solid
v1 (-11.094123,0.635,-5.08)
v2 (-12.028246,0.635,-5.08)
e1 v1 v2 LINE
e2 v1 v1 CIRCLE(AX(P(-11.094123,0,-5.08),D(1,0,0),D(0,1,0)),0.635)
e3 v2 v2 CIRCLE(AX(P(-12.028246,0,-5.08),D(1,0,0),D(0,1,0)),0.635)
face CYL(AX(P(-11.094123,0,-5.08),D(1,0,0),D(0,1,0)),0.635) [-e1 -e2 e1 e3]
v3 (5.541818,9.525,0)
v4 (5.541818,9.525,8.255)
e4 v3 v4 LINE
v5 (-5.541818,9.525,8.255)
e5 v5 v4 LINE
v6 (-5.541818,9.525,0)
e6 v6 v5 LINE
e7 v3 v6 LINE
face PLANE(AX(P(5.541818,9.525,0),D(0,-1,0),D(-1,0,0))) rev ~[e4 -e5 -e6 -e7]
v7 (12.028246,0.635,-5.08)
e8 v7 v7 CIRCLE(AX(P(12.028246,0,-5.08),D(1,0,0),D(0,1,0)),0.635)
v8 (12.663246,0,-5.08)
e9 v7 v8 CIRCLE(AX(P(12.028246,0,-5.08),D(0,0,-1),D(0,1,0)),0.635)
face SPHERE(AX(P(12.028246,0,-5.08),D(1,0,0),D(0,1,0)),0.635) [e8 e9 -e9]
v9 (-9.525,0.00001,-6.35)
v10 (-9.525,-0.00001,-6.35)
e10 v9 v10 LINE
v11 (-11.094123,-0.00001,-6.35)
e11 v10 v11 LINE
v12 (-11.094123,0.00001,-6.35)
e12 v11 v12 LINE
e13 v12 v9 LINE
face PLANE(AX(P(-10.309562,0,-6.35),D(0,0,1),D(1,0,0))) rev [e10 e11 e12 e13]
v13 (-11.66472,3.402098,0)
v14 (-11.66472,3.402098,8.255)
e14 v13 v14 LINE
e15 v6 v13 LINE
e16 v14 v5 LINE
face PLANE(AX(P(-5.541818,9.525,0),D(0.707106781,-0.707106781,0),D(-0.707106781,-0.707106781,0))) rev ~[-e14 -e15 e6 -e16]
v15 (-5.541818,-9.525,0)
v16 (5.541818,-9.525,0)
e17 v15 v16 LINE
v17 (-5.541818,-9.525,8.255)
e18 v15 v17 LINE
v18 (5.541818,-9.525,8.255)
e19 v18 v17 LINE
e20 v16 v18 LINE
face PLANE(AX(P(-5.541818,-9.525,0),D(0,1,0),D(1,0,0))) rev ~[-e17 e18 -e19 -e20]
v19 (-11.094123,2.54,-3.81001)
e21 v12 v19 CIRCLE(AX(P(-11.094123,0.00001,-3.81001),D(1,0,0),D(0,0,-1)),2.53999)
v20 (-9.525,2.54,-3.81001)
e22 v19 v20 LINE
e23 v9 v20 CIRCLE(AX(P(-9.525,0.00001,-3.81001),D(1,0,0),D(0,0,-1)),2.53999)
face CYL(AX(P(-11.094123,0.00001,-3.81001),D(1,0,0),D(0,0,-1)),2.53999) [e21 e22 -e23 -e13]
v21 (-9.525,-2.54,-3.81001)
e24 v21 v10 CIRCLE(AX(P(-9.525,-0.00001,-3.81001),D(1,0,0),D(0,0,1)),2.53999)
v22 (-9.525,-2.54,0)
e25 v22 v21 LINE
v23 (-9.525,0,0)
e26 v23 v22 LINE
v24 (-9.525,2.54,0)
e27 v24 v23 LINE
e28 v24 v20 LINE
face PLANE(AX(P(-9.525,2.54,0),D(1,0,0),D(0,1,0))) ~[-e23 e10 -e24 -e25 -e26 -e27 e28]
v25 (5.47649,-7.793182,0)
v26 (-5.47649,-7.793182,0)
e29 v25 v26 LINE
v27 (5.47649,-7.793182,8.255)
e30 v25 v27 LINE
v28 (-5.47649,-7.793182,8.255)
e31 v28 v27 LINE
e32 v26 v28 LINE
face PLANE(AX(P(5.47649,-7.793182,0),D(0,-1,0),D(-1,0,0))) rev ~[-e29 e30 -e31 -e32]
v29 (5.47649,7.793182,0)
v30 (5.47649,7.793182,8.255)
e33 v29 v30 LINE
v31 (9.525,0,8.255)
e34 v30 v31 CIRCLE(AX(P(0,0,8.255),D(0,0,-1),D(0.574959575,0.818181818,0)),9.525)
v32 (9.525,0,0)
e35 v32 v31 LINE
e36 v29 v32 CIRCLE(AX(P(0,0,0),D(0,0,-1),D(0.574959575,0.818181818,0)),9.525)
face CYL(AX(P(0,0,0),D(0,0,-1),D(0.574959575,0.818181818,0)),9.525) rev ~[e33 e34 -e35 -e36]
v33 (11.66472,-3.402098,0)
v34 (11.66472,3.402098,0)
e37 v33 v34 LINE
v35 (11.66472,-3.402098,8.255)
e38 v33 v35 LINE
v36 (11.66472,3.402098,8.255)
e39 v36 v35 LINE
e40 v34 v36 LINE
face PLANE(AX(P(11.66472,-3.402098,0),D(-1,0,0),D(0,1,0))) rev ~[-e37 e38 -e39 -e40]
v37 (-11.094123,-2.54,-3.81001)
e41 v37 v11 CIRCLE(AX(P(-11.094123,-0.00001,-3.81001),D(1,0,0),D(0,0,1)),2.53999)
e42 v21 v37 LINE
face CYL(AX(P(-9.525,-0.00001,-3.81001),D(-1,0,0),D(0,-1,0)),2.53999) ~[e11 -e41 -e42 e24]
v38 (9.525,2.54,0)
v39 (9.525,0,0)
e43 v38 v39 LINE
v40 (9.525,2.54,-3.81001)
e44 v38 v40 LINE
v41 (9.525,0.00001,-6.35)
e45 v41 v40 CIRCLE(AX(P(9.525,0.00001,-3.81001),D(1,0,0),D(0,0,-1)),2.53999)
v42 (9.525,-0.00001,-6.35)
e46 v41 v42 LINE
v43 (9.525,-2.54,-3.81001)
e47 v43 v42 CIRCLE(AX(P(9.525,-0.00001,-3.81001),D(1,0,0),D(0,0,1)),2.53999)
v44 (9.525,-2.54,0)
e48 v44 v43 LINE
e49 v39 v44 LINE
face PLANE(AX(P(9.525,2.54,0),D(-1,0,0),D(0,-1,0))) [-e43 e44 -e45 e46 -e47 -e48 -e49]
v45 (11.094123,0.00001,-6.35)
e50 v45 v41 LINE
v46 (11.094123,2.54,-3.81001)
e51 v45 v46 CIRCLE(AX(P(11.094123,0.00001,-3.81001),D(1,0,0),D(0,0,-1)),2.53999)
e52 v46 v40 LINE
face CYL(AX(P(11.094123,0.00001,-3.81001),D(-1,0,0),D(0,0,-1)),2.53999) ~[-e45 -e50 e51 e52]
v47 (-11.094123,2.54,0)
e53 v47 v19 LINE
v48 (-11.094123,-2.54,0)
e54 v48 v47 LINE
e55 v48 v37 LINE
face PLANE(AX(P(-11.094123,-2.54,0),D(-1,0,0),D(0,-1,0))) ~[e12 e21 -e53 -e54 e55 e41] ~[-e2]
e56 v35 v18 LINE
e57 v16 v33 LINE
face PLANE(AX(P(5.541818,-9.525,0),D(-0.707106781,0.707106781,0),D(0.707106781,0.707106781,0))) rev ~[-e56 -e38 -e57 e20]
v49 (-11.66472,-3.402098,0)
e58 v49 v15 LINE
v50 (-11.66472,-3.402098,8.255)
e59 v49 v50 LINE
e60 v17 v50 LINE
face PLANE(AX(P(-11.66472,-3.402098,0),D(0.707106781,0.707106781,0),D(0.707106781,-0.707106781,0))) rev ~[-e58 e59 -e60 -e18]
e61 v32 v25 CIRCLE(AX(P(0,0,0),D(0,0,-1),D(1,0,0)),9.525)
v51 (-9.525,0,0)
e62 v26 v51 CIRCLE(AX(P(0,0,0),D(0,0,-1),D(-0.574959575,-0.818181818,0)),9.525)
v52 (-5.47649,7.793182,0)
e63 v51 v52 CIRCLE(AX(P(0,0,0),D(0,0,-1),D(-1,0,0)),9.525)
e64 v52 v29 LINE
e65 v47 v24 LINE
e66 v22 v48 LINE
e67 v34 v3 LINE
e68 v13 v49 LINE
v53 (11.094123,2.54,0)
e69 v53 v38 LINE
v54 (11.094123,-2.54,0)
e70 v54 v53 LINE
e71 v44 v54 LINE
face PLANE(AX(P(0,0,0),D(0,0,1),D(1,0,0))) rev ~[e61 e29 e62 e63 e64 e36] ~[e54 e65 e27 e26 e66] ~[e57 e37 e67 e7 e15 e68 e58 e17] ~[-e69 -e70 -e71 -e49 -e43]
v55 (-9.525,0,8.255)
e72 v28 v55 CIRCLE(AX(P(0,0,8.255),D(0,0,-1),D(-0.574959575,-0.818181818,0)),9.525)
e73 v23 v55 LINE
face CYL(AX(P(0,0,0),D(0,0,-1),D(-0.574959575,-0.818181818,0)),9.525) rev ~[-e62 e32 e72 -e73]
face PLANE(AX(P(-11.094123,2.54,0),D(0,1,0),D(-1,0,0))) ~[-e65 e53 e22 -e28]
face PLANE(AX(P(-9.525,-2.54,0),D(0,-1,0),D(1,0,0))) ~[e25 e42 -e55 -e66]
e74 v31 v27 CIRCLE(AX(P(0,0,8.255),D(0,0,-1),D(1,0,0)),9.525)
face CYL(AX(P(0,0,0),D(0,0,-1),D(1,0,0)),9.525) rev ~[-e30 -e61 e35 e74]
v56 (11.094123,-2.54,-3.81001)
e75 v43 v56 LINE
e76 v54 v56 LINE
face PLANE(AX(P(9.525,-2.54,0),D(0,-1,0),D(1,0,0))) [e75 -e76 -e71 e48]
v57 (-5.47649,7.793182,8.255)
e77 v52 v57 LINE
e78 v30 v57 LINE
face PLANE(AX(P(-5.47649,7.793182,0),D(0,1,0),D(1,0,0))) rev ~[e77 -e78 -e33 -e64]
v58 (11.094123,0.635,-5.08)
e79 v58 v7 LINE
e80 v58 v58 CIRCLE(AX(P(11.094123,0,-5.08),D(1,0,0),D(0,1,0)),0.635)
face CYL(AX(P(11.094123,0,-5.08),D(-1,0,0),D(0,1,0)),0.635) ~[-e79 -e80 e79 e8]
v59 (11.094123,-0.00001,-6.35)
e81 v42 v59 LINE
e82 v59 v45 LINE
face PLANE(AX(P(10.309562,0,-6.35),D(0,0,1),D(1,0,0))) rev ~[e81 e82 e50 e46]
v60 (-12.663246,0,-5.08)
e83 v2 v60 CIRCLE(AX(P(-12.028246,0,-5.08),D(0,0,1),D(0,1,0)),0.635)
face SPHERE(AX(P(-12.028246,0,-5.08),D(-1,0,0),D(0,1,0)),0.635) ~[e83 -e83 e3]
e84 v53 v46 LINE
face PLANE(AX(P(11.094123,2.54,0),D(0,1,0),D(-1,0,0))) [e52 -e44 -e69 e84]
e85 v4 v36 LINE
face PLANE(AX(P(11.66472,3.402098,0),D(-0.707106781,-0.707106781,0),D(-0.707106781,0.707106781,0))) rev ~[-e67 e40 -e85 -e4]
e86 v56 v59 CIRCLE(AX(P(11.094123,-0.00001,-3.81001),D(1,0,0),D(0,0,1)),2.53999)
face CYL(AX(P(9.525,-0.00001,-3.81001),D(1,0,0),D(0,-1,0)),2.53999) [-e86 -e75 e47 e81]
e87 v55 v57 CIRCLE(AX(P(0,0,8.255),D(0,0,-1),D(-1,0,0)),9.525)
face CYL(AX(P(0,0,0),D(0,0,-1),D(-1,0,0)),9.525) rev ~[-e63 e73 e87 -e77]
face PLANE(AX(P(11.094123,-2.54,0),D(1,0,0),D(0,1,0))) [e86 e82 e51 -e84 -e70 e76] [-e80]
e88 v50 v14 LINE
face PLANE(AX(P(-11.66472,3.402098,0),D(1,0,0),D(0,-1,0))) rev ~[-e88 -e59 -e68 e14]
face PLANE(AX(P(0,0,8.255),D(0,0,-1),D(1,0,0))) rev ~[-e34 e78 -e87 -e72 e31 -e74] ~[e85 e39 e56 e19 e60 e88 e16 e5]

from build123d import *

# Parameters (mm, degrees)
F1_DEPTH  = 16.51
F3_DEPTH  = 6.35
F4_R      = 0.635
F5_DEPTH  = 1.5691231
F6_R      = 2.53999
F7_R      = 0.635
F9_DEPTH  = 6.35
F11_D     = 2.54
F16_D     = 127
F16_DEPTH = 14.606


# Not quite as in the source:
# - a fillet or chamfer is up to 0.001 mm smaller than in the source, because OpenCascade refuses the exact size
# - a length typed as a fraction of an inch, garbled in the dataset ("3 / 203.2 mm" for 3/8 in), is restored
# - the program builds the solid bodies; features that only make, move or delete a surface that nothing else refers to are left out


with BuildPart() as f1:
    # F0 (on Top) → F1 (new body)
    with BuildSketch(Plane.XY):
        Polygon((5.5418181818, 9.525), (0, 9.525), (-5.5418181818, 9.525), (-11.6647200825, 3.4020980993), (-11.6647200825, 0), (-11.6647200825, -3.4020980993), (-5.5418181818, -9.525), (0, -9.525), (5.5418181818, -9.525), (11.6647200825, -3.4020980993), (11.6647200825, 0), (11.6647200825, 3.4020980993), align=None)
        with BuildLine():
            ThreePointArc((5.4764899478, 7.7931818182), (8.4524905132, 4.3910168667), (9.525, 0))
            ThreePointArc((9.525, 0), (8.4524905132, -4.3910168667), (5.4764899478, -7.7931818182))
            Line((5.4764899478, -7.7931818182), (0, -7.7931818182))
            Line((0, -7.7931818182), (-5.4764899478, -7.7931818182))
            ThreePointArc((-5.4764899478, -7.7931818182), (-8.4524905132, -4.3910168667), (-9.525, 0))
            ThreePointArc((-9.525, 0), (-8.4524905132, 4.3910168667), (-5.4764899478, 7.7931818182))
            Line((-5.4764899478, 7.7931818182), (0, 7.7931818182))
            Line((0, 7.7931818182), (5.4764899478, 7.7931818182))
        make_face(mode=Mode.SUBTRACT)
    extrude(amount=F1_DEPTH)

    # F2 (on Top) → F3 (join)
    with BuildSketch(Plane.XY):
        Polygon((11.0941231, -2.54), (11.0941231, 0), (11.0941231, 2.54), (9.525, 2.54), (9.525, 0), (9.525, -2.54), align=None)
    extrude(amount=-F3_DEPTH)

    # F4 (on face) → F5 (join)
    with BuildSketch(Plane.YZ.offset(11.0941231)):
        with Locations((0, -5.08)):
            Circle(F4_R)
    extrude(amount=F5_DEPTH)

    # F6 (radius 2.54 in the source; OpenCascade refuses exactly that, so slightly less here)
    f6_edges = [f1.edges().sort_by_distance(p)[0] for p in [
        (10.309562, -2.54, -6.35),
        (10.309562, 2.54, -6.35),
    ]]
    fillet(f6_edges, radius=F6_R)

    # F7
    f7_edges = [f1.edges().sort_by_distance(p)[0] for p in [
        (12.663246, -0.635, -5.08),
    ]]
    fillet(f7_edges, radius=F7_R)

    # F8 (on face) → F9 (join)
    with BuildSketch(Plane.XY.offset(16.51)):
        Polygon((11.6647200825, 2.54), (10.095592022, 2.54), (10.095592022, 0), (10.095592022, -2.54), (11.6647200825, -2.54), (11.6647200825, 0), align=None)
    extrude(amount=F9_DEPTH)

    # F11 (through all)
    with Locations(Plane.YZ.offset(11.6647200825)):
        with Locations((0, 20.32)):
            Hole(F11_D / 2)

    # F12: F1 across plane


with BuildPart() as f1_1:
    add(f1.part)
    add(f1.part.mirror(Plane.YZ))

    # F16 (through all, one way)
    with BuildSketch(Plane(origin=(0, 0, 8.255), x_dir=(1, 0, 0), z_dir=(0, 0, -1))):
        with Locations((0, 0)):
            Circle(F16_D / 2)
    extrude(amount=-F16_DEPTH, mode=Mode.SUBTRACT)


solid = f1_1.part
